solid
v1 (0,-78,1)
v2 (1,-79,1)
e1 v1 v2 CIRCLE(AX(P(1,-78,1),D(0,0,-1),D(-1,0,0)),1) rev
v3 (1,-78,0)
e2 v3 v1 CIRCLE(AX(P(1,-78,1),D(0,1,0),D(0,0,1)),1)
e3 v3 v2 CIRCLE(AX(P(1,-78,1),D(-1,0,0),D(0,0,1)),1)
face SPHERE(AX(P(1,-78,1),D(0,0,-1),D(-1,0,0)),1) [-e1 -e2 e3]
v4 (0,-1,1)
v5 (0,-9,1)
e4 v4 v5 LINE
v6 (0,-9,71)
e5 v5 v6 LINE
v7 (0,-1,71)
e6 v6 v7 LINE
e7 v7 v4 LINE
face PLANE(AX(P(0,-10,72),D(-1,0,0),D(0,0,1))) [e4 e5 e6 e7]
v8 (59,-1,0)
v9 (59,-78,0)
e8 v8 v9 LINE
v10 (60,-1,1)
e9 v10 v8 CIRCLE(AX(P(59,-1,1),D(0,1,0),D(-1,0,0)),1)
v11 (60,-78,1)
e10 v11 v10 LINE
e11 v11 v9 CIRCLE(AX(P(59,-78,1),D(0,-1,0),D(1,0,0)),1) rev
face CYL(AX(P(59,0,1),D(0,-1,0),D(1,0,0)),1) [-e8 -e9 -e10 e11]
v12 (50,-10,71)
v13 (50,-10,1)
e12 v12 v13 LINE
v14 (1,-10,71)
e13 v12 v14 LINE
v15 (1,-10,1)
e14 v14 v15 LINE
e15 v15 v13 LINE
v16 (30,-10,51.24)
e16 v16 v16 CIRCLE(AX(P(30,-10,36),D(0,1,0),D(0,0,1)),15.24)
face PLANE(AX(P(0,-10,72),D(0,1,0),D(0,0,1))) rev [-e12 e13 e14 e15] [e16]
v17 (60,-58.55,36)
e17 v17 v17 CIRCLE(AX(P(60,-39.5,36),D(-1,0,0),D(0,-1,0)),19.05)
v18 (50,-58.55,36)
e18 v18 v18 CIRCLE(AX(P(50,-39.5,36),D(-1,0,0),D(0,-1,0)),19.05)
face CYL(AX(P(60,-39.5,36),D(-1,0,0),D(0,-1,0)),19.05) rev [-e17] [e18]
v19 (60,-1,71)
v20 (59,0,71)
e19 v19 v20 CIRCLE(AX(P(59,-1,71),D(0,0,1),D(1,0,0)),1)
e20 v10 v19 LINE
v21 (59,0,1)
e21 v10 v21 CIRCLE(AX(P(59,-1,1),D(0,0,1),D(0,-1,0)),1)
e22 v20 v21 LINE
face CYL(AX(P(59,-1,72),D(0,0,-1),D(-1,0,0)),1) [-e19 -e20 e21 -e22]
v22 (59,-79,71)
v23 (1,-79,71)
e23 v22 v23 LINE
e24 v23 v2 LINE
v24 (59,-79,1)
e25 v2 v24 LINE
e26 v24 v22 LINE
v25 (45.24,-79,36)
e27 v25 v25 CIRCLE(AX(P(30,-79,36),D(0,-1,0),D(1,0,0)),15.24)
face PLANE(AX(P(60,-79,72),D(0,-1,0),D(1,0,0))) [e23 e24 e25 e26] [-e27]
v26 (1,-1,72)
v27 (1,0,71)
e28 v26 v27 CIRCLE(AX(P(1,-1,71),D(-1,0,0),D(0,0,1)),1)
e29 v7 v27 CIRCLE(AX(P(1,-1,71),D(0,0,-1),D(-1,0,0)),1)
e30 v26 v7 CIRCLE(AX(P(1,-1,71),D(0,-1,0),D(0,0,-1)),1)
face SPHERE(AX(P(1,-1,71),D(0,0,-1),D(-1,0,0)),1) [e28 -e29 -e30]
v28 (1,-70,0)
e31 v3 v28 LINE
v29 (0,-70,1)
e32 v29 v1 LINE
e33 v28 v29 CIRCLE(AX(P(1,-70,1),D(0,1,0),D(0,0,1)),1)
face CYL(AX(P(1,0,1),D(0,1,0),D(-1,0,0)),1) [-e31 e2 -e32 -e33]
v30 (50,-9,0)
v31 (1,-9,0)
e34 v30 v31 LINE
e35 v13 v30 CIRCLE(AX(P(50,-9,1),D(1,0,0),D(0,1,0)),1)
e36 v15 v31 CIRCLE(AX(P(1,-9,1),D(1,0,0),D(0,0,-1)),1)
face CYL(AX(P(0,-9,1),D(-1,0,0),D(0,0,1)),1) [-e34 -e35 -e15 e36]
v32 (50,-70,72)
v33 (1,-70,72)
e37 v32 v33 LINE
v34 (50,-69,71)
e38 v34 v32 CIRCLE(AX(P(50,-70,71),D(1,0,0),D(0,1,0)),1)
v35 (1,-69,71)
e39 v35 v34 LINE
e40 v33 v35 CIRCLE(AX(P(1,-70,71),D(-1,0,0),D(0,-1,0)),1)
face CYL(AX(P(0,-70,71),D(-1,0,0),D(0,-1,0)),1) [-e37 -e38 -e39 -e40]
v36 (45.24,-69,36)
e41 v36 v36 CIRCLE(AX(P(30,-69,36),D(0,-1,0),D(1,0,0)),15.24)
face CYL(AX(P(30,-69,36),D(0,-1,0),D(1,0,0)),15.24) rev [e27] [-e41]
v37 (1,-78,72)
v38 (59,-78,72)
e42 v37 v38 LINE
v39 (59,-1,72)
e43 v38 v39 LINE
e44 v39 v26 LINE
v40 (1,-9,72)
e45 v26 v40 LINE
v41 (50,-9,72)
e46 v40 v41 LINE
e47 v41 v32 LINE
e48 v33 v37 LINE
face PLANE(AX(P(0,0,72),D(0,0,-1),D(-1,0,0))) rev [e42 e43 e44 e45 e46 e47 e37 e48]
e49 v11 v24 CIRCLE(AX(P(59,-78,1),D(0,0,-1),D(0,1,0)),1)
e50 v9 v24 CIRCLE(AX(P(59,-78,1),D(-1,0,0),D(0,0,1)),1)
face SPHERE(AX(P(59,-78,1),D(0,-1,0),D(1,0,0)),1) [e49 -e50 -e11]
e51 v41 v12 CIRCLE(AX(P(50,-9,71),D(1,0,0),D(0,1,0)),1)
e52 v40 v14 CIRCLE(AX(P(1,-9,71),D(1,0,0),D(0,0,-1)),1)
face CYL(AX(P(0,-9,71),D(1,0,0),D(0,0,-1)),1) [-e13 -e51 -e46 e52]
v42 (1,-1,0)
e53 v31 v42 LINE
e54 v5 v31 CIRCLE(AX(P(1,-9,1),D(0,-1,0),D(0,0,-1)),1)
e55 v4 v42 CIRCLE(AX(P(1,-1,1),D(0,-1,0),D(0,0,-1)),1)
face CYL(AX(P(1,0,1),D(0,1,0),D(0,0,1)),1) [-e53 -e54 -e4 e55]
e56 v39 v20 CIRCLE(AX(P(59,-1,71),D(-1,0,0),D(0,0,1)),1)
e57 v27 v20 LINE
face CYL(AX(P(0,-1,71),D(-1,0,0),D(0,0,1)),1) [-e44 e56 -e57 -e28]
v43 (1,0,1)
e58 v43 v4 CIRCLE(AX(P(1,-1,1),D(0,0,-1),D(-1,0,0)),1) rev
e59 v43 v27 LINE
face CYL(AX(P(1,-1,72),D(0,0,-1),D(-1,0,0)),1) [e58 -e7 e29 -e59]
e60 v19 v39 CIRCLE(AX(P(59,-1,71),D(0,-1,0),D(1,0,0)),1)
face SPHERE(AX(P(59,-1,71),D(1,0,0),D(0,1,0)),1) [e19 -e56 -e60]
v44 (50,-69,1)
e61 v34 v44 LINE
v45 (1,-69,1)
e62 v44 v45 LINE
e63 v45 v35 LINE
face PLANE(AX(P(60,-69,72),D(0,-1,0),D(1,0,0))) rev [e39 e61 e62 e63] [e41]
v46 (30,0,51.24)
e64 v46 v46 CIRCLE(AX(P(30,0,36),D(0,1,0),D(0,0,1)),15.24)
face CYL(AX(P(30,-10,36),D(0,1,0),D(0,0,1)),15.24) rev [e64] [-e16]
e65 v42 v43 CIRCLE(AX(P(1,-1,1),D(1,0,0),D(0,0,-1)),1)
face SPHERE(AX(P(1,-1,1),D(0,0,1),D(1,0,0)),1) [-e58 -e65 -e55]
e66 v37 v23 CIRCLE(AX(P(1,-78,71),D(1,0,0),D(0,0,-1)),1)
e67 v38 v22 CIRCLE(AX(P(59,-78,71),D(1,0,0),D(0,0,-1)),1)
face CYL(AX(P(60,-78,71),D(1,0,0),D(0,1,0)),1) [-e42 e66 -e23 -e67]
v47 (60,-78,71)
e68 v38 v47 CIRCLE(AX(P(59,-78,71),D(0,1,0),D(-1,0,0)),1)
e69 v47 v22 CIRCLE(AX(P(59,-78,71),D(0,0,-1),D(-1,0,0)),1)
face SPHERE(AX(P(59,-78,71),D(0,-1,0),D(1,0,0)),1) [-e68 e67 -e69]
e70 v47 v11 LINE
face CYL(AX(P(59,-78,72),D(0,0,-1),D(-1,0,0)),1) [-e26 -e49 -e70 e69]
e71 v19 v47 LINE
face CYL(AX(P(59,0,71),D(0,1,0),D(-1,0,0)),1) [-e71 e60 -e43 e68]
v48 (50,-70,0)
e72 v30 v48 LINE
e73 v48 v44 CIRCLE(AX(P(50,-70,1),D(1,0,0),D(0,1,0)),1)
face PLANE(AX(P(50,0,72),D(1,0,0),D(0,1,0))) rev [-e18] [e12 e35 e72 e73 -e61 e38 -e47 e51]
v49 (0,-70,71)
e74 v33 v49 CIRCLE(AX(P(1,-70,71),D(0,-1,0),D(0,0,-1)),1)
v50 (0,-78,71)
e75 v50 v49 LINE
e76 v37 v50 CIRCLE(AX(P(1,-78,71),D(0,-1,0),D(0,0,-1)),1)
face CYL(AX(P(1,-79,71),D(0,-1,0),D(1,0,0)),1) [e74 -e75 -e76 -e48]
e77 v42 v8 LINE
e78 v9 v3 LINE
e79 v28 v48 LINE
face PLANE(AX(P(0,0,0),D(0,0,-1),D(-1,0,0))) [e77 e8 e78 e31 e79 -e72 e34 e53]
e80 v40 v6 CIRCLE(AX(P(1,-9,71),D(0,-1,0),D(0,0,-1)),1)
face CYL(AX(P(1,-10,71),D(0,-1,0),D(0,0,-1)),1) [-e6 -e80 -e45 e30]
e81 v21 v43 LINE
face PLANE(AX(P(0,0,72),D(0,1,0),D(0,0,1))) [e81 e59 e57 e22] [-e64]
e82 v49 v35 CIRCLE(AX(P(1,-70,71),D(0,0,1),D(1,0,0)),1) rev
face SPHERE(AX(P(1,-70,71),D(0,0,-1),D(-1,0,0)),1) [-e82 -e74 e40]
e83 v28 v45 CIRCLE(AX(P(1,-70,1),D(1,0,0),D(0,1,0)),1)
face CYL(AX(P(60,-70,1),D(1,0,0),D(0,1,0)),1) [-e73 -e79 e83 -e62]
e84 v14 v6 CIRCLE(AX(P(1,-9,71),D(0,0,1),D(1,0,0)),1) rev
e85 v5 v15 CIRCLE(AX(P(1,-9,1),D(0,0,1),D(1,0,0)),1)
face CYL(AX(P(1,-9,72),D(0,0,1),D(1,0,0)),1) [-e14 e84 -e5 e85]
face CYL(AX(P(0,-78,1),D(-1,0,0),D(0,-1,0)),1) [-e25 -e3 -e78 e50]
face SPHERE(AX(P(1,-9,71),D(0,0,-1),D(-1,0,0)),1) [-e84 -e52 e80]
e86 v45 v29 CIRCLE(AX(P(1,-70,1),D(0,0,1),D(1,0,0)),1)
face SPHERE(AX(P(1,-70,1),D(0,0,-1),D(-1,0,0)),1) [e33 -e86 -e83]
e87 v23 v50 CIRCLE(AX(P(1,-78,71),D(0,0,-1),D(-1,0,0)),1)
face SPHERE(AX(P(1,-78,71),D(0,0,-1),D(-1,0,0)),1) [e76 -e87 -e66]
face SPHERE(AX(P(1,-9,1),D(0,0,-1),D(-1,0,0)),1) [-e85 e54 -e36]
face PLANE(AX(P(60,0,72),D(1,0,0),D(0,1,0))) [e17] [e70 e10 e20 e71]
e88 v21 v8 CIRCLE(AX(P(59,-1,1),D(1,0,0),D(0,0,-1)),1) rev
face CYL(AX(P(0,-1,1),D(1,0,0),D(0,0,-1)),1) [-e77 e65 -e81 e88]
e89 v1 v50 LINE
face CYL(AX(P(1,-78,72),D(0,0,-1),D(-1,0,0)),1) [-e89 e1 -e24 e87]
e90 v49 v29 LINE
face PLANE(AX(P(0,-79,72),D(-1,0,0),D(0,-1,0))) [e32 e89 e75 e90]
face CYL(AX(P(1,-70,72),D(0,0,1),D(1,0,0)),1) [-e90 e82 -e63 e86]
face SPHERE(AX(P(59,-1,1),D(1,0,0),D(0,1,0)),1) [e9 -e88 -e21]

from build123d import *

# Parameters (mm, degrees)
EXTRUDE_THIN1_DEPTH = 72
SKETCH2_R           = 15.24
CUT_EXTRUDE2_DEPTH  = 10
CUT_EXTRUDE3_START  = -10
SKETCH3_R           = 15.24
CUT_EXTRUDE3_DEPTH  = 10
SKETCH6_R           = 19.05
CUT_EXTRUDE4_DEPTH  = 10
FILLET2_R           = 1
FILLET3_R           = 1
FILLET4_R           = 1
FILLET5_R           = 1
FILLET6_R           = 1
FILLET7_R           = 1
FILLET8_R           = 1
FILLET9_R           = 1


with BuildPart() as part:
    # Sketch1 → Extrude-Thin1 (new body)
    with BuildSketch(Plane.XY):
        Polygon((0, 0), (60, 0), (60, -79), (0, -79), (0, -69), (50, -69), (50, -10), (0, -10), align=None)
    extrude(amount=EXTRUDE_THIN1_DEPTH)

    # Sketch2 → Cut-Extrude2 (cut)
    with BuildSketch(Plane(origin=(0, 0, 0), x_dir=(1, 0, 0), z_dir=(0, 1, 0))):
        with Locations(Location((30, -36, 0), (0, 0, 270))):
            Circle(SKETCH2_R)
    extrude(amount=-CUT_EXTRUDE2_DEPTH, mode=Mode.SUBTRACT)

    # Sketch3 → Cut-Extrude3 (cut)
    with BuildSketch(Plane.XZ.offset(79).offset(CUT_EXTRUDE3_START)):
        with Locations(Location((30, 36, 0), (0, 0, 90))):
            Circle(SKETCH3_R)
    extrude(amount=CUT_EXTRUDE3_DEPTH, mode=Mode.SUBTRACT)

    # Sketch6 → Cut-Extrude4 (cut)
    with BuildSketch(Plane.ZY.offset(-50)):
        with Locations(Location((36, -39.5, 0), (0, 0, 270))):
            Circle(SKETCH6_R)
    extrude(amount=-CUT_EXTRUDE4_DEPTH, mode=Mode.SUBTRACT)

    # Fillet2
    fillet2_edges = [part.edges().sort_by_distance(p)[0] for p in [
        (0, 0, 36),
        (30, 0, 0),
    ]]
    fillet(fillet2_edges, radius=FILLET2_R)

    # Fillet3
    fillet3_edges = [part.edges().sort_by_distance(p)[0] for p in [
        (0, -10, 36),
    ]]
    fillet(fillet3_edges, radius=FILLET3_R)

    # Fillet4
    # the kernel refuses this fillet: 1 mm, written as the material it takes off along each edge
    with BuildSketch(Plane(origin=(1, -1, 1), x_dir=(0, 0, -1), z_dir=(-1, 0, 0))) as fillet4_piece_1_section:
        Polygon((0, 0), (FILLET4_R, 0), (FILLET4_R, -FILLET4_R), (0, -FILLET4_R), align=None)
    fillet4_piece_1 = extrude(amount=FILLET4_R, mode=Mode.PRIVATE)
    fillet4_piece_1 = fillet4_piece_1 - Plane(origin=(1, -1, 1), x_dir=(0, -0.7071067811865475, 0.7071067811865475), z_dir=(-1, 0, 0)) * Sphere(FILLET4_R, mode=Mode.PRIVATE)
    add(fillet4_piece_1, mode=Mode.SUBTRACT)
    with BuildSketch(Plane(origin=(50, -10, 0), x_dir=(0, 0, 1), z_dir=(-1, 0, 0))) as fillet4_piece_2:
        with BuildLine():
            CenterArc((FILLET4_R, FILLET4_R), FILLET4_R, 180, 90)
            Line((0, FILLET4_R), (0, 0))
            Line((0, 0), (FILLET4_R, 0))
        make_face()
    extrude(amount=49, mode=Mode.SUBTRACT)
    with BuildSketch(Plane(origin=(0, -9, 0), x_dir=(0, 0, 1), z_dir=(0, 1, 0))) as fillet4_piece_3:
        with BuildLine():
            CenterArc((FILLET4_R, FILLET4_R), FILLET4_R, 180, 90)
            Line((0, FILLET4_R), (0, 0))
            Line((0, 0), (FILLET4_R, 0))
        make_face()
    extrude(amount=8, mode=Mode.SUBTRACT)
    with BuildSketch(Plane(origin=(1, -9, 0), x_dir=(-1, 0, 0), z_dir=(0, 1, 0))) as fillet4_piece_4:
        with BuildLine():
            CenterArc((1 - FILLET4_R, FILLET4_R), FILLET4_R, 270, 90)
            Line((1 - FILLET4_R, 0), (1, 0))
            Line((1, 0), (1, FILLET4_R))
        make_face()
    revolve(axis=Axis((1, -9, 0), (0, 0, 1)), revolution_arc=90, mode=Mode.SUBTRACT)

    # Fillet5
    fillet5_edges = [part.edges().sort_by_distance(p)[0] for p in [
        (30.5, 0, 72),
        (0.292893219, -0.292893219, 72),
        (25.5, -10, 72),
        (0, -5, 72),
        (0.292893219, -9.707106781, 72),
    ]]
    fillet(fillet5_edges, radius=FILLET5_R)

    # Fillet6
    fillet6_edges = [part.edges().sort_by_distance(p)[0] for p in [
        (60, -40, 0),
        (60, -0.292893219, 0.292893219),
        (60, -40, 72),
        (60, 0, 36),
        (60, -0.292893219, 71.707106781),
    ]]
    fillet(fillet6_edges, radius=FILLET6_R)

    # Fillet7
    fillet7_edges = [part.edges().sort_by_distance(p)[0] for p in [
        (0, -69, 36),
    ]]
    fillet(fillet7_edges, radius=FILLET7_R)

    # Fillet8
    fillet8_edges = [part.edges().sort_by_distance(p)[0] for p in [
        (0, -79, 36),
    ]]
    fillet(fillet8_edges, radius=FILLET8_R)

    # Fillet9
    fillet9_edges = [part.edges().sort_by_distance(p)[0] for p in [
        (0.292893219, -69.292893219, 0),
        (0.292893219, -69.292893219, 72),
        (0, -74, 0),
        (0.292893219, -78.707106781, 0),
        (0, -74, 72),
        (0.292893219, -78.707106781, 72),
        (25.5, -69, 72),
        (60, -79, 36),
        (30, -79, 0),
        (25.5, -69, 0),
        (30, -79, 72),
        (59.707106781, -79, 0.292893219),
        (59.707106781, -79, 71.707106781),
    ]]
    fillet(fillet9_edges, radius=FILLET9_R)


solid = part.part
